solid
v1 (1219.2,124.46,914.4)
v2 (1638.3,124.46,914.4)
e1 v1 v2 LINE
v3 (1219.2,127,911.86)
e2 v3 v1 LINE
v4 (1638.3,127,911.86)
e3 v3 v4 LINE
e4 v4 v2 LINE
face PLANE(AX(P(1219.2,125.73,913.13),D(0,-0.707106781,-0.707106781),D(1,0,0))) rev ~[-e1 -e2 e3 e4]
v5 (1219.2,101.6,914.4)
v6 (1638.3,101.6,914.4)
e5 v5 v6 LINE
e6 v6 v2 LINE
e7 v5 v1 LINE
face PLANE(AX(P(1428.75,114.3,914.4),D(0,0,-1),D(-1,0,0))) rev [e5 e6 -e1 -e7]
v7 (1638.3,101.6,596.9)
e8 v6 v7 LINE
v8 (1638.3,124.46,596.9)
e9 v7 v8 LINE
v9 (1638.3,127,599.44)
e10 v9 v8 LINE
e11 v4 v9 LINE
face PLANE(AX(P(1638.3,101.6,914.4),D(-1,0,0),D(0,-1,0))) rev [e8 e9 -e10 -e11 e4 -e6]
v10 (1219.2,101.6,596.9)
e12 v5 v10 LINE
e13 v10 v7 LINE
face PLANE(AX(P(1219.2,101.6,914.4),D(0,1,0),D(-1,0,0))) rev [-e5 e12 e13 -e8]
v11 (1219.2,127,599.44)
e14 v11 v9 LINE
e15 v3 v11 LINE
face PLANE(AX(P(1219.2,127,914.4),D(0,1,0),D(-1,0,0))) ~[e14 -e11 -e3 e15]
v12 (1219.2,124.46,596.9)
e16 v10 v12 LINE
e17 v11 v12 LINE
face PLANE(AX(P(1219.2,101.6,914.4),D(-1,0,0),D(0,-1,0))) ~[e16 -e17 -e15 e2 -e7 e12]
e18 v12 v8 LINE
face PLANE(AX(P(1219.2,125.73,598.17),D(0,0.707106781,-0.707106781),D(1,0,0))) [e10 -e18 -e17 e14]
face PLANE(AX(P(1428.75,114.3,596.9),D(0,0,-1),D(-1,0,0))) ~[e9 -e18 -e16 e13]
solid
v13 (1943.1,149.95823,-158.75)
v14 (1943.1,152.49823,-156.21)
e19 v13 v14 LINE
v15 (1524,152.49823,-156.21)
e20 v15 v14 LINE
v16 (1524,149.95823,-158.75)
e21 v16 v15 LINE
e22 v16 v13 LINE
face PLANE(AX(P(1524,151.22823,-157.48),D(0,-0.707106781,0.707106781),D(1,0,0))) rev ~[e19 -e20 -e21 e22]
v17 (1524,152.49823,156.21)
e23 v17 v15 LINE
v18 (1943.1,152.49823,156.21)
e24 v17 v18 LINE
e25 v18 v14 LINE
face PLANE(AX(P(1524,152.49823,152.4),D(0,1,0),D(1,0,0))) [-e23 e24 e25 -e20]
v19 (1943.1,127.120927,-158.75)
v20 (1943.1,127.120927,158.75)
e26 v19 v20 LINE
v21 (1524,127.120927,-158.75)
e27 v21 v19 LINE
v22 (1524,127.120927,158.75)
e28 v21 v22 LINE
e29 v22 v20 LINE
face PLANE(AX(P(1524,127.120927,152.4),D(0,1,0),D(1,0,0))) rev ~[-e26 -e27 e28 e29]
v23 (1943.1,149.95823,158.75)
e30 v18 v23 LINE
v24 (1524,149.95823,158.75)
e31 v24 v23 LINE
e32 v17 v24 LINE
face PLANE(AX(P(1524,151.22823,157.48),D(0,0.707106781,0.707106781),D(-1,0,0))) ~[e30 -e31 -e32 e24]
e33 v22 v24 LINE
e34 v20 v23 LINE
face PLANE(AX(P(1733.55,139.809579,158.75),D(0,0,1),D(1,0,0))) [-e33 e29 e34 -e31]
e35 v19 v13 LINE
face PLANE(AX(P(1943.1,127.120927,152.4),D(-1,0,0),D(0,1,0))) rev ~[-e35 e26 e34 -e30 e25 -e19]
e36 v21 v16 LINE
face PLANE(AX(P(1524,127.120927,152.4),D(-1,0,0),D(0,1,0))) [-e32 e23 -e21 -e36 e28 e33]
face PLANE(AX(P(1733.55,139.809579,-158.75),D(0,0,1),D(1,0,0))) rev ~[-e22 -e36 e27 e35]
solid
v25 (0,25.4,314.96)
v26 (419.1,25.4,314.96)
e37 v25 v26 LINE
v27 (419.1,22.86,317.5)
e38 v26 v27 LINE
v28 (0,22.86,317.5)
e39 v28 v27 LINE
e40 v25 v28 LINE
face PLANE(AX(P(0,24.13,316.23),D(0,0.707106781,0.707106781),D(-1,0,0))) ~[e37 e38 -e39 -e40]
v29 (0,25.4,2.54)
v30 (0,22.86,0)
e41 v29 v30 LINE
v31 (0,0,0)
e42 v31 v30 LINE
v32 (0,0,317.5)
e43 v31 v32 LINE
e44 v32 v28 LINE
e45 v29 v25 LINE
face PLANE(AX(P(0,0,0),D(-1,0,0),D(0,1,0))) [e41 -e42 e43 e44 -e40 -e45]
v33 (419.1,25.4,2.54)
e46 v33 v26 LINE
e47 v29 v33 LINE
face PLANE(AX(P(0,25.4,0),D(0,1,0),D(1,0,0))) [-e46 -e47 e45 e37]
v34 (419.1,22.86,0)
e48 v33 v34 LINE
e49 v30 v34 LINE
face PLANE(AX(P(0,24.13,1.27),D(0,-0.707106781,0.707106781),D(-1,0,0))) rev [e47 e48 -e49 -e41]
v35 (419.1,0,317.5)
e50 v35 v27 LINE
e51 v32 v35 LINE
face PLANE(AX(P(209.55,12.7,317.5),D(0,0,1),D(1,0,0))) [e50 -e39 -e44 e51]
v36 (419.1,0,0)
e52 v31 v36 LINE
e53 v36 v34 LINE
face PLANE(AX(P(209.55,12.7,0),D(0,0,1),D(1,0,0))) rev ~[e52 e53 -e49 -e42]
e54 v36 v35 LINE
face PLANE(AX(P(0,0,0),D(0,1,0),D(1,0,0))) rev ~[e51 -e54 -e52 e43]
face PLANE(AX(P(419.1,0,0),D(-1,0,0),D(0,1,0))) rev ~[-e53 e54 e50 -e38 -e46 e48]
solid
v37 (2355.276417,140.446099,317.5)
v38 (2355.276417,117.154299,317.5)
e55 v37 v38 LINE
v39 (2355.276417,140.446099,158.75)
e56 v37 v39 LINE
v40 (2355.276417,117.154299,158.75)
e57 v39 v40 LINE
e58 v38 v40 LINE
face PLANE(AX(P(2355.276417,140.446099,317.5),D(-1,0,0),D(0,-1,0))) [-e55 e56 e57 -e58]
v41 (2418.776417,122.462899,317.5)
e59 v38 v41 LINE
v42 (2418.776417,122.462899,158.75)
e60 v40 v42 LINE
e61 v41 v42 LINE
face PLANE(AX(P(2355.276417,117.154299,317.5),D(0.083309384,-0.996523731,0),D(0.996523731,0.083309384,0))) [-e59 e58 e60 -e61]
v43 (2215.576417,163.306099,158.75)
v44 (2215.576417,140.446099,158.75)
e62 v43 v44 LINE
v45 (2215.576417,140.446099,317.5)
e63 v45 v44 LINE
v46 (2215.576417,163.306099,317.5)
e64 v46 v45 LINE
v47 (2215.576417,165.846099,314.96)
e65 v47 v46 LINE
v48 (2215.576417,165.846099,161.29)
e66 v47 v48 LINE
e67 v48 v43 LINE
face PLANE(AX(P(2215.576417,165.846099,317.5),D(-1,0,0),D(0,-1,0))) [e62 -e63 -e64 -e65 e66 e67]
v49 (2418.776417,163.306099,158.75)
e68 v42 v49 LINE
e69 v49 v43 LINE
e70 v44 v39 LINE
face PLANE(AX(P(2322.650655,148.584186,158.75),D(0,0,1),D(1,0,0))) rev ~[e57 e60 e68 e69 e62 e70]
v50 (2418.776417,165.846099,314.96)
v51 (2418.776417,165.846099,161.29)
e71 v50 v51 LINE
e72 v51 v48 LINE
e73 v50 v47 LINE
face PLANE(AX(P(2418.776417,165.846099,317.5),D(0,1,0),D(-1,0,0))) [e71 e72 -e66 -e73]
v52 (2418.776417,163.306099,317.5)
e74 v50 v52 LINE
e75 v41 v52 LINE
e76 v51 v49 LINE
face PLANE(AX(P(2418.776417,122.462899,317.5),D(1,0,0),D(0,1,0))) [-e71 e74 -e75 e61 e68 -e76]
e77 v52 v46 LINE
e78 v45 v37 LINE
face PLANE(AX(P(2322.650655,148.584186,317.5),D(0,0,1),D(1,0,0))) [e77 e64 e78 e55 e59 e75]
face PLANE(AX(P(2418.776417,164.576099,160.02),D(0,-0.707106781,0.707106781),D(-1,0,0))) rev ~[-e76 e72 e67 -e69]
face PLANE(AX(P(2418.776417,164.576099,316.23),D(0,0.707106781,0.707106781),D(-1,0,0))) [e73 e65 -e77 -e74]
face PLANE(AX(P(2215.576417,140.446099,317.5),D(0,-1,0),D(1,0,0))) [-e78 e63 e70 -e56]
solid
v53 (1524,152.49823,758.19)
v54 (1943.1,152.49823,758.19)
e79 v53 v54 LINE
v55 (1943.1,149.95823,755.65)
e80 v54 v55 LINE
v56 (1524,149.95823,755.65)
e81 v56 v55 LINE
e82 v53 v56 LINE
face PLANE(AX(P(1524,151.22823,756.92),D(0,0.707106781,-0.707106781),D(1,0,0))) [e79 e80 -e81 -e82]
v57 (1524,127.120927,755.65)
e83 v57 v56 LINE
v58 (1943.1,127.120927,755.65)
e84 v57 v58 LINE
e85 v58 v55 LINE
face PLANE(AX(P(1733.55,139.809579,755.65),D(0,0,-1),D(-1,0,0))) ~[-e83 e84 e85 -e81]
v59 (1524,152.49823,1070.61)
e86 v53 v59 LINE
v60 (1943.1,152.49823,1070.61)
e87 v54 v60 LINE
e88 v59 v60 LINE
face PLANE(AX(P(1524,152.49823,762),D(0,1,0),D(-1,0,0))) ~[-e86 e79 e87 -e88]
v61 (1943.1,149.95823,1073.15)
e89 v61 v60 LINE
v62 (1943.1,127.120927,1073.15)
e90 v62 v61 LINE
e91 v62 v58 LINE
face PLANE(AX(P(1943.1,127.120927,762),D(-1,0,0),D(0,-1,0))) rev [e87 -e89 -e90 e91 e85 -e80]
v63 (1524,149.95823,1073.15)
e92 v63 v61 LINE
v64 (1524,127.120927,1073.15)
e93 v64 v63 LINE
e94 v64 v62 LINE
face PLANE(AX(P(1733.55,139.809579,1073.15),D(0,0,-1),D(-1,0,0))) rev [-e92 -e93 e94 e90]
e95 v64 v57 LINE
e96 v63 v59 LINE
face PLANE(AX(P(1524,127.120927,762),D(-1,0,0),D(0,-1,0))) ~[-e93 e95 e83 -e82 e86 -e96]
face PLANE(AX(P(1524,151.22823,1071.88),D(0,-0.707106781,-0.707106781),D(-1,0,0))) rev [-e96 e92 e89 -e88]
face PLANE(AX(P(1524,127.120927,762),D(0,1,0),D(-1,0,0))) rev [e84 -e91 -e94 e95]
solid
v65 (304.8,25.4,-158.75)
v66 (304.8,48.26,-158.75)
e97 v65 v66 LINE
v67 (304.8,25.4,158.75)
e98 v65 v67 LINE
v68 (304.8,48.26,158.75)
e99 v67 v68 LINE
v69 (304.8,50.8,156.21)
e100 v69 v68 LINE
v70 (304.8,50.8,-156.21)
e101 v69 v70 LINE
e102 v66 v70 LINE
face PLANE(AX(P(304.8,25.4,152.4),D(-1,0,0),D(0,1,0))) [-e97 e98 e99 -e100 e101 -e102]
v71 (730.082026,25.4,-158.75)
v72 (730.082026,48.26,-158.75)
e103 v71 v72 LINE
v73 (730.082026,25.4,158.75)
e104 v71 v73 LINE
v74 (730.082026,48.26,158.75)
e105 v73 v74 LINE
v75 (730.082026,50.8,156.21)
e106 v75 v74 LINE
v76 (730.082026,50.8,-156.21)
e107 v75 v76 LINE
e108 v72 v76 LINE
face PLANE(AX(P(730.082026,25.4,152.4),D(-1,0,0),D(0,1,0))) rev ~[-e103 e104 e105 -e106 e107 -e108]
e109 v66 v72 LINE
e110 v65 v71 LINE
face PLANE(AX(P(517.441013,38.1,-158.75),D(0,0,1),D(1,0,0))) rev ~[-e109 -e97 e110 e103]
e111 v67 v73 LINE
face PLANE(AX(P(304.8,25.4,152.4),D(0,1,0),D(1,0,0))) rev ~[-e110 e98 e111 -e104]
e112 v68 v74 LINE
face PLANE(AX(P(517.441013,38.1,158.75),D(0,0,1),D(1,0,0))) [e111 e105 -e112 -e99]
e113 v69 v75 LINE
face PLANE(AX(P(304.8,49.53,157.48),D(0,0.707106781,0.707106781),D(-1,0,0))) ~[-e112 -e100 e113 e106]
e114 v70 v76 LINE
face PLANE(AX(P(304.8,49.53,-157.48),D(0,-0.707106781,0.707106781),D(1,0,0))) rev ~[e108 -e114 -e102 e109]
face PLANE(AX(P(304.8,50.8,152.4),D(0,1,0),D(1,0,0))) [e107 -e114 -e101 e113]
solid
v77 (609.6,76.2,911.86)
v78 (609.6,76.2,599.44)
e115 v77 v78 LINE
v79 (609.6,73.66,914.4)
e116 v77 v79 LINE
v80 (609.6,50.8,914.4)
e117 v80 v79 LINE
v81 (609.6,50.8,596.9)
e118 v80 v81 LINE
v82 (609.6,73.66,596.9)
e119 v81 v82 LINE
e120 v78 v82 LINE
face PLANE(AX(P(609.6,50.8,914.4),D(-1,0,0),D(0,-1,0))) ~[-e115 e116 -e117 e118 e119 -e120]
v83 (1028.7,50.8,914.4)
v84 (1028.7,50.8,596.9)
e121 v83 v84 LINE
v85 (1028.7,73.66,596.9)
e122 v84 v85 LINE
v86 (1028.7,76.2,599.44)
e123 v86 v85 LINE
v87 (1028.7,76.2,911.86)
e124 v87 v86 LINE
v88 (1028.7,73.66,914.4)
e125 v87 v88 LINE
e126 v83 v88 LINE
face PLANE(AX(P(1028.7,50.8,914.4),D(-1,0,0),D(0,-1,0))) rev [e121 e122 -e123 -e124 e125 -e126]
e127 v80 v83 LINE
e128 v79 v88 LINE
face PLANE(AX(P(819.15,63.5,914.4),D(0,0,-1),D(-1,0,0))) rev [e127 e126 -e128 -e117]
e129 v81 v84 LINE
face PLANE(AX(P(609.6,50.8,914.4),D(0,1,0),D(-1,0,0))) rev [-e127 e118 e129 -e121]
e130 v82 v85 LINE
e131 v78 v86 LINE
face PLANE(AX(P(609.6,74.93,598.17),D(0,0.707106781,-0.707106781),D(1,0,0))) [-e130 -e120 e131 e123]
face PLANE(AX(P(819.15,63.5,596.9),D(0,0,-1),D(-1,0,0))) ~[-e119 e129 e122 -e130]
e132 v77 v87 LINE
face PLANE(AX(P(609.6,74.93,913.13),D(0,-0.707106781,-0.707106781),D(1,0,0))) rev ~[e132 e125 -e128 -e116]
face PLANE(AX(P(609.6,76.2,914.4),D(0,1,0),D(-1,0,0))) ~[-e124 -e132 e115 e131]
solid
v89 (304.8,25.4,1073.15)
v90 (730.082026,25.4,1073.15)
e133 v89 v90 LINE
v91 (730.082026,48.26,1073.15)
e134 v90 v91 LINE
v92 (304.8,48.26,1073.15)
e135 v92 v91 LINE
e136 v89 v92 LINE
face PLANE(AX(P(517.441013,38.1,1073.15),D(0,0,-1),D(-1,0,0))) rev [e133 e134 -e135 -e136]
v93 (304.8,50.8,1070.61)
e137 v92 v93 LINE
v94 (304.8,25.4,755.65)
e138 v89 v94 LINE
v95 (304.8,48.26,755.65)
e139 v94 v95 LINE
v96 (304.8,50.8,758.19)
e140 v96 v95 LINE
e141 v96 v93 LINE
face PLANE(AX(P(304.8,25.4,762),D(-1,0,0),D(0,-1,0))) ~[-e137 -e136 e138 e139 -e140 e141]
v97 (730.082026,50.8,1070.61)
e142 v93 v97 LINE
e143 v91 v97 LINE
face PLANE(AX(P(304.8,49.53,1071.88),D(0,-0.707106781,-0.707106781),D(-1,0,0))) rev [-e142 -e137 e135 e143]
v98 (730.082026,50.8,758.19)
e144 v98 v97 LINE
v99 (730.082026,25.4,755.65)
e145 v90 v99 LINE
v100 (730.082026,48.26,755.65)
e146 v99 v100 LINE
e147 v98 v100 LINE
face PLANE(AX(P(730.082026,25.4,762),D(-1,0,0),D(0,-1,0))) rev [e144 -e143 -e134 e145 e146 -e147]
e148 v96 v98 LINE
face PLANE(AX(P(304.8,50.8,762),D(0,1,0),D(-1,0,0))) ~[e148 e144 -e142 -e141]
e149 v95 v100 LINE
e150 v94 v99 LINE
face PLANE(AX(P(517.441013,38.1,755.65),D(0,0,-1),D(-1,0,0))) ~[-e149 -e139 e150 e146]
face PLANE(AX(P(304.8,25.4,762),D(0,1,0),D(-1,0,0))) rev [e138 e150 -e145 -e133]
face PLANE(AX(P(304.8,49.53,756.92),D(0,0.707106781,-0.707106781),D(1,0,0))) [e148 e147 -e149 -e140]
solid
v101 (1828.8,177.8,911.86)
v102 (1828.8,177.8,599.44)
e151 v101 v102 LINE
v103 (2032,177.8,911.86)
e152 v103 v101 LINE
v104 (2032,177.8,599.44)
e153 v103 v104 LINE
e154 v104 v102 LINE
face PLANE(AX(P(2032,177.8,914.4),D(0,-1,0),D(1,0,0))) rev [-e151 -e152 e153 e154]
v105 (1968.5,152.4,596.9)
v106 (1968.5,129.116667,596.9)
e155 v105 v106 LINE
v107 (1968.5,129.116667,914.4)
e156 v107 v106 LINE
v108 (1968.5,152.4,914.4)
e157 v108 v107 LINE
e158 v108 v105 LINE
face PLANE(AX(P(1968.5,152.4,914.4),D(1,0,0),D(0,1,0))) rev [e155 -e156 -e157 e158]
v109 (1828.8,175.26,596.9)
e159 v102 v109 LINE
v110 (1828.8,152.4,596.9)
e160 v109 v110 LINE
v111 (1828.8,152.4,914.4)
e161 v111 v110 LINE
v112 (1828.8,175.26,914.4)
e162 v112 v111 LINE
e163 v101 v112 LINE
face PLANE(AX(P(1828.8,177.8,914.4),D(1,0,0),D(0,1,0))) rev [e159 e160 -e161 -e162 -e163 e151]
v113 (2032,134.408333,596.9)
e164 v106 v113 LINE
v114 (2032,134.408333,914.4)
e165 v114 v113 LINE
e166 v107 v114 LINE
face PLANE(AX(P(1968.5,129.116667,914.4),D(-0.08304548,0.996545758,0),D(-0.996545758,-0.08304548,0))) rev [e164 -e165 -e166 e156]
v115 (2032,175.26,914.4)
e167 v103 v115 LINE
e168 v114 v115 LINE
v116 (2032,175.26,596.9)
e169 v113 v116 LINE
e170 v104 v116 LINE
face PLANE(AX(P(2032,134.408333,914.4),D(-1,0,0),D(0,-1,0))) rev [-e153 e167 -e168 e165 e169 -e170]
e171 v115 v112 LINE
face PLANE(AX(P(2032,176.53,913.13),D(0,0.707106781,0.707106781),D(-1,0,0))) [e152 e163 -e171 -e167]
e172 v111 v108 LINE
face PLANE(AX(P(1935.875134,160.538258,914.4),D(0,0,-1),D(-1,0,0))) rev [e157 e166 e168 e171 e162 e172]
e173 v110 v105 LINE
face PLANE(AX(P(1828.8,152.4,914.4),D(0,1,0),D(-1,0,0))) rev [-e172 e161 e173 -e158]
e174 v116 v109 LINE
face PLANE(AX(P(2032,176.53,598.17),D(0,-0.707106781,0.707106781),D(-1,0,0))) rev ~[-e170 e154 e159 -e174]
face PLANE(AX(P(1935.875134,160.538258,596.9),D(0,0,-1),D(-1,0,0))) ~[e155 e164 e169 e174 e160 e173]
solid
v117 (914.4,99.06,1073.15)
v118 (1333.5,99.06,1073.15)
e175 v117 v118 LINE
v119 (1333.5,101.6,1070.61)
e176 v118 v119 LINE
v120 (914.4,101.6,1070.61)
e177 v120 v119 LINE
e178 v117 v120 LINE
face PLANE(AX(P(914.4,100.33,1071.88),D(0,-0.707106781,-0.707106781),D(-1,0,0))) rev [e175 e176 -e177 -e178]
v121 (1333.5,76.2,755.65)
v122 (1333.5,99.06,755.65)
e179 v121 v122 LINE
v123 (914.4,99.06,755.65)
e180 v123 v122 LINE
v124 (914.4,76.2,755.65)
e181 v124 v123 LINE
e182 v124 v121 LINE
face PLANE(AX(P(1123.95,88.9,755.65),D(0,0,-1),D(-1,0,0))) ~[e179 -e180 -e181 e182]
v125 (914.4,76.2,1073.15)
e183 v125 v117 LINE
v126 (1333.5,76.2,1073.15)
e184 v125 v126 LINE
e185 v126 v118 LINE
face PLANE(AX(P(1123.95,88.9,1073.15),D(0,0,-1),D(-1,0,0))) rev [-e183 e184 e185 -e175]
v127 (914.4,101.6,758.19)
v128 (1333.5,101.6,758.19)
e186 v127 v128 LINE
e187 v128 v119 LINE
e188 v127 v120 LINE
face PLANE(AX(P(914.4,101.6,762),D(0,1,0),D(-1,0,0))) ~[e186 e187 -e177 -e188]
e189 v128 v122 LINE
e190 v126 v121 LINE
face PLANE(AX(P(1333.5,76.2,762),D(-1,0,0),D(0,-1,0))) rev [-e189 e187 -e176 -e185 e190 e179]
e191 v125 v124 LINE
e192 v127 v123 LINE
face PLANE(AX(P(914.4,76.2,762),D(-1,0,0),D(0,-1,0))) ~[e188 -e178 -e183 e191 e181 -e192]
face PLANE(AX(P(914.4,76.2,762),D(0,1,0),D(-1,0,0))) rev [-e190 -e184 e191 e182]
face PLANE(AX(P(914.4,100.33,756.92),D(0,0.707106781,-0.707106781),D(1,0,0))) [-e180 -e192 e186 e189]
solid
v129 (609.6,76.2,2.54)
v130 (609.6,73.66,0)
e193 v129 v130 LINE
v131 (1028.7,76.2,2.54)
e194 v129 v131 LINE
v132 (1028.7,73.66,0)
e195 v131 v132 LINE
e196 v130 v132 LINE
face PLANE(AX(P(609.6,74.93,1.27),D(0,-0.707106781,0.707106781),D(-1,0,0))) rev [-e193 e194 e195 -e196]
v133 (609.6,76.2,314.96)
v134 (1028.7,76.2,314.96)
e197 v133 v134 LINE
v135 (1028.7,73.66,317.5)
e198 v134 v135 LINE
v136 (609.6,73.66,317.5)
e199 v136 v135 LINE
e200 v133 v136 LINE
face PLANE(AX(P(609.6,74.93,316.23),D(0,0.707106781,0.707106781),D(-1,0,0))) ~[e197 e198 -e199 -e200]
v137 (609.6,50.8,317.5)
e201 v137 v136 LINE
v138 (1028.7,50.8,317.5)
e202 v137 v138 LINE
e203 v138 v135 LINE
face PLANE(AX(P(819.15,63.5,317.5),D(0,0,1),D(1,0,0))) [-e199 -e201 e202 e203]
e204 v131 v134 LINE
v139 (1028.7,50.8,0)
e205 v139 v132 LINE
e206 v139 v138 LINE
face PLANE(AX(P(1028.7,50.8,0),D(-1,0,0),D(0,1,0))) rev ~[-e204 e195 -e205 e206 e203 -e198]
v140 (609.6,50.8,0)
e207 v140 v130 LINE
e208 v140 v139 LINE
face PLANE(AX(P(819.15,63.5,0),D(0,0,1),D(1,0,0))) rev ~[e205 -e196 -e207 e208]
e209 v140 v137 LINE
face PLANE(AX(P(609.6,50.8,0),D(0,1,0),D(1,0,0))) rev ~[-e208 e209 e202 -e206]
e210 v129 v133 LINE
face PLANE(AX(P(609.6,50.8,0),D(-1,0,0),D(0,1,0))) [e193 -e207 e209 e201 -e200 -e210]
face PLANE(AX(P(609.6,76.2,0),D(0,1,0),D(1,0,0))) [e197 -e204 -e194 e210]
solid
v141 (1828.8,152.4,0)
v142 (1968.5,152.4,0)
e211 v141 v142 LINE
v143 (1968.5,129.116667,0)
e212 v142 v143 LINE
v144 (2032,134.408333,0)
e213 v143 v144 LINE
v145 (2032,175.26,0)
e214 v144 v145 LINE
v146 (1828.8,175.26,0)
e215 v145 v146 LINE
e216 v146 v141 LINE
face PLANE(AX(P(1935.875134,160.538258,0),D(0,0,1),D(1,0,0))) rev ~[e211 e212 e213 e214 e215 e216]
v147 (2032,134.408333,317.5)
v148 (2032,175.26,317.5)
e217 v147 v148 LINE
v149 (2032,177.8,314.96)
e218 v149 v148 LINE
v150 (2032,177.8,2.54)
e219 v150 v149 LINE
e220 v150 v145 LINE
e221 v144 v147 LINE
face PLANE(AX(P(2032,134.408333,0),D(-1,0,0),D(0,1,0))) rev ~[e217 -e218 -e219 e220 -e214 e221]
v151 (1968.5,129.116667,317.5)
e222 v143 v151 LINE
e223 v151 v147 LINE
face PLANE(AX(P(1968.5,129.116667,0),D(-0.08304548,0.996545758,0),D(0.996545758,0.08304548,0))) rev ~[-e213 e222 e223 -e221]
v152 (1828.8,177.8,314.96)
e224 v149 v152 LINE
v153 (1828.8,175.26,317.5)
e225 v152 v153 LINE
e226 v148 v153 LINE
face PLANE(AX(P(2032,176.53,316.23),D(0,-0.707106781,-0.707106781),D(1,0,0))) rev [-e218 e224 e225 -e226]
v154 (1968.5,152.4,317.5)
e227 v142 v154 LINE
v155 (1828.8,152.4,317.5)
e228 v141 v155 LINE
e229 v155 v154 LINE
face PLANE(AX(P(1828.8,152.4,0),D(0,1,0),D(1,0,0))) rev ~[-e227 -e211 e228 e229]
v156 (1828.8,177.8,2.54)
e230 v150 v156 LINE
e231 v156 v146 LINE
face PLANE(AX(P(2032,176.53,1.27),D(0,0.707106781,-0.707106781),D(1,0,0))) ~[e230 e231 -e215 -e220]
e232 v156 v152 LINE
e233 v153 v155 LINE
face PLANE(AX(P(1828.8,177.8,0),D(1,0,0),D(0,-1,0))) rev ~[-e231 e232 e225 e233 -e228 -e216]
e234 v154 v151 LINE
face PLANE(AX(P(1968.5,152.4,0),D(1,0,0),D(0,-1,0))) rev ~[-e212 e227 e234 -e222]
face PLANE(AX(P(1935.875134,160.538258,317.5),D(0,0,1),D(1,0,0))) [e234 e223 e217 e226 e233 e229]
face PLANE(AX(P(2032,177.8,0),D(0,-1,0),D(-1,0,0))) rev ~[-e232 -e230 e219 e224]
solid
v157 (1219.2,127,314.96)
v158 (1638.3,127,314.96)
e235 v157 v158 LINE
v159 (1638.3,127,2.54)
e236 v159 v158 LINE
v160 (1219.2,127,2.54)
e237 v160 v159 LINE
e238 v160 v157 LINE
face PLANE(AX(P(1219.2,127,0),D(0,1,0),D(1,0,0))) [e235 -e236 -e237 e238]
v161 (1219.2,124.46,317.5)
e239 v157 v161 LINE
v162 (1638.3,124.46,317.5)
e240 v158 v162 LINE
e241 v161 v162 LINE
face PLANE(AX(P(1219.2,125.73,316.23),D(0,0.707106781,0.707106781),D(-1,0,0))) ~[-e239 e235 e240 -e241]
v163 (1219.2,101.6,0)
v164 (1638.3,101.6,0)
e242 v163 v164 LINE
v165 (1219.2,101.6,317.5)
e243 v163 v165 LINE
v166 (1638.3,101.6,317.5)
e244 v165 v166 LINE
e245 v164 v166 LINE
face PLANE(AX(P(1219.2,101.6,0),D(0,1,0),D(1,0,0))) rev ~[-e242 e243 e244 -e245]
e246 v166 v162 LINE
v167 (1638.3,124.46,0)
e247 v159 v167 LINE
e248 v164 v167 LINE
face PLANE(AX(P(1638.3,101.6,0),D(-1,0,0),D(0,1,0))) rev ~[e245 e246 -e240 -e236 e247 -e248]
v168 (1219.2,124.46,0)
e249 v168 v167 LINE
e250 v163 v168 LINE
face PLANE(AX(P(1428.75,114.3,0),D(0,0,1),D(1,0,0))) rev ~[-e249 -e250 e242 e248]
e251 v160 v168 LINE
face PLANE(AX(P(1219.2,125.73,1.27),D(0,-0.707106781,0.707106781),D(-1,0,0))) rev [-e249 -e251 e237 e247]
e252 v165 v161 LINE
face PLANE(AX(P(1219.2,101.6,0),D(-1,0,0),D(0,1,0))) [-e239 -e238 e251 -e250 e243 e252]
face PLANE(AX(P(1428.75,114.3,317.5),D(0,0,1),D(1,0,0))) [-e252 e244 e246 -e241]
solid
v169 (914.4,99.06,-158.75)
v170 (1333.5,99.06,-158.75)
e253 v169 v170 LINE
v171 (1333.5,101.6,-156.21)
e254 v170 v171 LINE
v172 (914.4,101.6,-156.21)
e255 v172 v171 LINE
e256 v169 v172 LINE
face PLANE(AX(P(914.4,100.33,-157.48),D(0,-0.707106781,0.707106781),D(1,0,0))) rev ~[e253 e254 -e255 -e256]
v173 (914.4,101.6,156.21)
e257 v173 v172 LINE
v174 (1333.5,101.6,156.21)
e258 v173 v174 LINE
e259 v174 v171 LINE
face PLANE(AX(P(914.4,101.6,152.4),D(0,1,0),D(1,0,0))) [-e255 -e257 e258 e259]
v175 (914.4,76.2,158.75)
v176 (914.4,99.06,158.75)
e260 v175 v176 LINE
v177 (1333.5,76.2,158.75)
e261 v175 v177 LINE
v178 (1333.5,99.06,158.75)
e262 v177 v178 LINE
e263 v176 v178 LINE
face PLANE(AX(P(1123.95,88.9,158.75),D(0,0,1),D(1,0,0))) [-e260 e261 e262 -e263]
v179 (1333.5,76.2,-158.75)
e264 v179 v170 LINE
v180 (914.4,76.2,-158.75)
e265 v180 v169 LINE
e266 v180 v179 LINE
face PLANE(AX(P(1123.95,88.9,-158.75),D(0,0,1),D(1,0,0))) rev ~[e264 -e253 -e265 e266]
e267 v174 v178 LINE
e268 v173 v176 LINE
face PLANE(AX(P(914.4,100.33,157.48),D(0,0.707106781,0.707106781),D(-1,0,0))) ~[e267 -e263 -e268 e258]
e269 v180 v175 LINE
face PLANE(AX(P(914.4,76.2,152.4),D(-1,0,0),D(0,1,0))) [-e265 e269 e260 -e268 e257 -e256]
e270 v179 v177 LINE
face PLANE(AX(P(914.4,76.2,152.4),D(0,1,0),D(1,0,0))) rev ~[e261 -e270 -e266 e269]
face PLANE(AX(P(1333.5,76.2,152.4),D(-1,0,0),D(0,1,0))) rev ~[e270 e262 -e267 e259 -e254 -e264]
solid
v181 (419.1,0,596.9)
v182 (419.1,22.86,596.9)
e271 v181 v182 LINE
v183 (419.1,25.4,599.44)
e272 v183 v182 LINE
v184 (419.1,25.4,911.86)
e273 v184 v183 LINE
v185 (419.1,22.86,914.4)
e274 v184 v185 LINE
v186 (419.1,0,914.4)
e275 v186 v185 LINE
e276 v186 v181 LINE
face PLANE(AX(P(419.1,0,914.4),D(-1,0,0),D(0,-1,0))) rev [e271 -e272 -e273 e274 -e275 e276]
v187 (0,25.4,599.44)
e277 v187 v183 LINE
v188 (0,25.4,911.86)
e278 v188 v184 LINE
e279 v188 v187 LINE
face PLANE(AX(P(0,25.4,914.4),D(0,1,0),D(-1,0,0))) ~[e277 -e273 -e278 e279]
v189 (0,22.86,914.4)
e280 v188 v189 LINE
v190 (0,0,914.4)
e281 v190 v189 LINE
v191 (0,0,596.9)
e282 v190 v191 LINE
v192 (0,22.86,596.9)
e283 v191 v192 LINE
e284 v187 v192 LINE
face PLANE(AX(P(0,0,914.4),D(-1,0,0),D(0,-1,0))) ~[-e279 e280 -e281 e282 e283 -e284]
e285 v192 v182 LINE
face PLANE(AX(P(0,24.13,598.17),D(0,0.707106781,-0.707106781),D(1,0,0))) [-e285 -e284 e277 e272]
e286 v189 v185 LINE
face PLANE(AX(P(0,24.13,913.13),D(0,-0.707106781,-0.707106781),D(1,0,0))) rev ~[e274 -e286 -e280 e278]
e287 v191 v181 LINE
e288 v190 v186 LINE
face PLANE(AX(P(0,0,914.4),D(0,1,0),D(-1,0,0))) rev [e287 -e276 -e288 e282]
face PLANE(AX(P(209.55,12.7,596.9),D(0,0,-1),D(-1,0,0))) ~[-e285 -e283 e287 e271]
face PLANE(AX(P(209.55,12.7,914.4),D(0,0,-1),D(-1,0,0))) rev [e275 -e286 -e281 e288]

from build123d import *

# Parameters (mm, degrees)
F0_W          = 419.1
F0_H          = 25.4
F1_DEPTH      = 317.5
F2_SIZE       = 2.54
F2_2_SIZE     = 2.54
F2_3_SIZE     = 2.54
F2_4_SIZE     = 2.54
F4_W          = 425.2820260142
F4_H          = 25.4
F5_DEPTH      = 311.15
F5_DEPTH_BACK = 6.35
F4_W_2        = 419.1
F4_H_2        = 25.3773033619
F6_SIZE       = 2.54
F6_2_SIZE     = 2.54
F6_3_SIZE     = 2.54
F8_DEPTH      = 158.75
F9_SIZE       = 2.54


# Not quite as in the source:
# - a feature names something its author has since deleted; it is built from what else it names


with BuildPart() as f1:
    # F0 (on Top) → F1 (new body)
    with BuildSketch(Plane.XY):
        with Locations((209.55, 12.7)):
            Rectangle(F0_W, F0_H)
    extrude(amount=F1_DEPTH)

    # F2
    f2_edges = [f1.edges().sort_by_distance(p)[0] for p in [
        (209.55, 25.4, 317.5),
        (209.55, 25.4, 0),
    ]]
    chamfer(f2_edges, length=F2_SIZE)


with BuildPart() as f1b:
    # F0 (on Top) → F1, piece 2 (new body)
    with BuildSketch(Plane.XY):
        with Locations((819.15, 63.5)):
            Rectangle(F0_W, F0_H)
    extrude(amount=F1_DEPTH)

    # F2#2
    f2_2_edges = [f1b.edges().sort_by_distance(p)[0] for p in [
        (819.15, 76.2, 317.5),
        (819.15, 76.2, 0),
    ]]
    chamfer(f2_2_edges, length=F2_2_SIZE)


with BuildPart() as f1c:
    # F0 (on Top) → F1, piece 3 (new body)
    with BuildSketch(Plane.XY):
        with Locations((1428.75, 114.3)):
            Rectangle(F0_W, F0_H)
    extrude(amount=F1_DEPTH)

    # F2#3
    f2_3_edges = [f1c.edges().sort_by_distance(p)[0] for p in [
        (1428.75, 127, 317.5),
        (1428.75, 127, 0),
    ]]
    chamfer(f2_3_edges, length=F2_3_SIZE)


with BuildPart() as f1d:
    # F0 (on Top) → F1, piece 4 (new body)
    with BuildSketch(Plane.XY):
        Polygon((1968.5, 152.4), (1968.5, 129.1166666667), (2032, 134.4083333333), (2032, 177.8), (1828.8, 177.8), (1828.8, 152.4), align=None)
    extrude(amount=F1_DEPTH)

    # F2#4
    f2_4_edges = [f1d.edges().sort_by_distance(p)[0] for p in [
        (1930.4, 177.8, 317.5),
        (1930.4, 177.8, 0),
    ]]
    chamfer(f2_4_edges, length=F2_4_SIZE)


with BuildPart() as f5:
    # F4 (on offset) → F5 (new body, two sides)
    with BuildSketch(Plane.XY.offset(152.4)) as f5_sk:
        with Locations((517.4410130071, 38.1)):
            Rectangle(F4_W, F4_H)
    extrude(amount=-F5_DEPTH)
    extrude(f5_sk.sketch, amount=F5_DEPTH_BACK)

    # F6
    f6_edges = [f5.edges().sort_by_distance(p)[0] for p in [
        (517.441013, 50.8, 158.75),
        (517.441013, 50.8, -158.75),
    ]]
    chamfer(f6_edges, length=F6_SIZE)


with BuildPart() as f5b:
    # F4 (on offset) → F5, piece 2 (new body, two sides)
    with BuildSketch(Plane.XY.offset(152.4)) as f5_2_sk:
        with Locations((1123.95, 88.9)):
            Rectangle(F4_W_2, F4_H)
    extrude(amount=-F5_DEPTH)
    extrude(f5_2_sk.sketch, amount=F5_DEPTH_BACK)

    # F6#2
    f6_2_edges = [f5b.edges().sort_by_distance(p)[0] for p in [
        (1123.95, 101.6, -158.75),
        (1123.95, 101.6, 158.75),
    ]]
    chamfer(f6_2_edges, length=F6_2_SIZE)


with BuildPart() as f5c:
    # F4 (on offset) → F5, piece 3 (new body, two sides)
    with BuildSketch(Plane.XY.offset(152.4)) as f5_3_sk:
        with Locations((1733.55, 139.8095786572)):
            Rectangle(F4_W_2, F4_H_2)
    extrude(amount=-F5_DEPTH)
    extrude(f5_3_sk.sketch, amount=F5_DEPTH_BACK)

    # F6#3
    f6_3_edges = [f5c.edges().sort_by_distance(p)[0] for p in [
        (1733.55, 152.49823, -158.75),
        (1733.55, 152.49823, 158.75),
    ]]
    chamfer(f6_3_edges, length=F6_3_SIZE)


with BuildPart() as f8:
    # F7 (on face) → F8 (new body)
    with BuildSketch(Plane.XY.offset(317.5)):
        Polygon((2418.7764174887, 165.8460989008), (2215.5764174887, 165.8460989008), (2215.5764174887, 140.4460989008), (2355.2764174887, 140.4460989008), (2355.2764174887, 117.1542989008), (2418.7764174887, 122.4628989008), align=None)
    extrude(amount=-F8_DEPTH)

    # F9
    f9_edges = [f8.edges().sort_by_distance(p)[0] for p in [
        (2317.176417, 165.846099, 317.5),
        (2317.176417, 165.846099, 158.75),
    ]]
    chamfer(f9_edges, length=F9_SIZE)


with BuildPart() as f11_1:
    # F11: instance of F5c
    add(f5c.part.mirror(Plane.XY.offset(457.2)))


with BuildPart() as f11_2:
    # F11: instance of F5b
    add(f5b.part.mirror(Plane.XY.offset(457.2)))


with BuildPart() as f11_3:
    # F11: instance of F5
    add(f5.part.mirror(Plane.XY.offset(457.2)))


with BuildPart() as f11_4:
    # F11: instance of F1d
    add(f1d.part.mirror(Plane.XY.offset(457.2)))


with BuildPart() as f11_5:
    # F11: instance of F1c
    add(f1c.part.mirror(Plane.XY.offset(457.2)))


with BuildPart() as f11_6:
    # F11: instance of F1b
    add(f1b.part.mirror(Plane.XY.offset(457.2)))


with BuildPart() as f11_7:
    # F11: instance of F1
    add(f1.part.mirror(Plane.XY.offset(457.2)))


solid = Compound([f1.part, f1b.part, f1c.part, f1d.part, f5.part, f5b.part, f5c.part, f8.part, f11_1.part, f11_2.part, f11_3.part, f11_4.part, f11_5.part, f11_6.part, f11_7.part])
